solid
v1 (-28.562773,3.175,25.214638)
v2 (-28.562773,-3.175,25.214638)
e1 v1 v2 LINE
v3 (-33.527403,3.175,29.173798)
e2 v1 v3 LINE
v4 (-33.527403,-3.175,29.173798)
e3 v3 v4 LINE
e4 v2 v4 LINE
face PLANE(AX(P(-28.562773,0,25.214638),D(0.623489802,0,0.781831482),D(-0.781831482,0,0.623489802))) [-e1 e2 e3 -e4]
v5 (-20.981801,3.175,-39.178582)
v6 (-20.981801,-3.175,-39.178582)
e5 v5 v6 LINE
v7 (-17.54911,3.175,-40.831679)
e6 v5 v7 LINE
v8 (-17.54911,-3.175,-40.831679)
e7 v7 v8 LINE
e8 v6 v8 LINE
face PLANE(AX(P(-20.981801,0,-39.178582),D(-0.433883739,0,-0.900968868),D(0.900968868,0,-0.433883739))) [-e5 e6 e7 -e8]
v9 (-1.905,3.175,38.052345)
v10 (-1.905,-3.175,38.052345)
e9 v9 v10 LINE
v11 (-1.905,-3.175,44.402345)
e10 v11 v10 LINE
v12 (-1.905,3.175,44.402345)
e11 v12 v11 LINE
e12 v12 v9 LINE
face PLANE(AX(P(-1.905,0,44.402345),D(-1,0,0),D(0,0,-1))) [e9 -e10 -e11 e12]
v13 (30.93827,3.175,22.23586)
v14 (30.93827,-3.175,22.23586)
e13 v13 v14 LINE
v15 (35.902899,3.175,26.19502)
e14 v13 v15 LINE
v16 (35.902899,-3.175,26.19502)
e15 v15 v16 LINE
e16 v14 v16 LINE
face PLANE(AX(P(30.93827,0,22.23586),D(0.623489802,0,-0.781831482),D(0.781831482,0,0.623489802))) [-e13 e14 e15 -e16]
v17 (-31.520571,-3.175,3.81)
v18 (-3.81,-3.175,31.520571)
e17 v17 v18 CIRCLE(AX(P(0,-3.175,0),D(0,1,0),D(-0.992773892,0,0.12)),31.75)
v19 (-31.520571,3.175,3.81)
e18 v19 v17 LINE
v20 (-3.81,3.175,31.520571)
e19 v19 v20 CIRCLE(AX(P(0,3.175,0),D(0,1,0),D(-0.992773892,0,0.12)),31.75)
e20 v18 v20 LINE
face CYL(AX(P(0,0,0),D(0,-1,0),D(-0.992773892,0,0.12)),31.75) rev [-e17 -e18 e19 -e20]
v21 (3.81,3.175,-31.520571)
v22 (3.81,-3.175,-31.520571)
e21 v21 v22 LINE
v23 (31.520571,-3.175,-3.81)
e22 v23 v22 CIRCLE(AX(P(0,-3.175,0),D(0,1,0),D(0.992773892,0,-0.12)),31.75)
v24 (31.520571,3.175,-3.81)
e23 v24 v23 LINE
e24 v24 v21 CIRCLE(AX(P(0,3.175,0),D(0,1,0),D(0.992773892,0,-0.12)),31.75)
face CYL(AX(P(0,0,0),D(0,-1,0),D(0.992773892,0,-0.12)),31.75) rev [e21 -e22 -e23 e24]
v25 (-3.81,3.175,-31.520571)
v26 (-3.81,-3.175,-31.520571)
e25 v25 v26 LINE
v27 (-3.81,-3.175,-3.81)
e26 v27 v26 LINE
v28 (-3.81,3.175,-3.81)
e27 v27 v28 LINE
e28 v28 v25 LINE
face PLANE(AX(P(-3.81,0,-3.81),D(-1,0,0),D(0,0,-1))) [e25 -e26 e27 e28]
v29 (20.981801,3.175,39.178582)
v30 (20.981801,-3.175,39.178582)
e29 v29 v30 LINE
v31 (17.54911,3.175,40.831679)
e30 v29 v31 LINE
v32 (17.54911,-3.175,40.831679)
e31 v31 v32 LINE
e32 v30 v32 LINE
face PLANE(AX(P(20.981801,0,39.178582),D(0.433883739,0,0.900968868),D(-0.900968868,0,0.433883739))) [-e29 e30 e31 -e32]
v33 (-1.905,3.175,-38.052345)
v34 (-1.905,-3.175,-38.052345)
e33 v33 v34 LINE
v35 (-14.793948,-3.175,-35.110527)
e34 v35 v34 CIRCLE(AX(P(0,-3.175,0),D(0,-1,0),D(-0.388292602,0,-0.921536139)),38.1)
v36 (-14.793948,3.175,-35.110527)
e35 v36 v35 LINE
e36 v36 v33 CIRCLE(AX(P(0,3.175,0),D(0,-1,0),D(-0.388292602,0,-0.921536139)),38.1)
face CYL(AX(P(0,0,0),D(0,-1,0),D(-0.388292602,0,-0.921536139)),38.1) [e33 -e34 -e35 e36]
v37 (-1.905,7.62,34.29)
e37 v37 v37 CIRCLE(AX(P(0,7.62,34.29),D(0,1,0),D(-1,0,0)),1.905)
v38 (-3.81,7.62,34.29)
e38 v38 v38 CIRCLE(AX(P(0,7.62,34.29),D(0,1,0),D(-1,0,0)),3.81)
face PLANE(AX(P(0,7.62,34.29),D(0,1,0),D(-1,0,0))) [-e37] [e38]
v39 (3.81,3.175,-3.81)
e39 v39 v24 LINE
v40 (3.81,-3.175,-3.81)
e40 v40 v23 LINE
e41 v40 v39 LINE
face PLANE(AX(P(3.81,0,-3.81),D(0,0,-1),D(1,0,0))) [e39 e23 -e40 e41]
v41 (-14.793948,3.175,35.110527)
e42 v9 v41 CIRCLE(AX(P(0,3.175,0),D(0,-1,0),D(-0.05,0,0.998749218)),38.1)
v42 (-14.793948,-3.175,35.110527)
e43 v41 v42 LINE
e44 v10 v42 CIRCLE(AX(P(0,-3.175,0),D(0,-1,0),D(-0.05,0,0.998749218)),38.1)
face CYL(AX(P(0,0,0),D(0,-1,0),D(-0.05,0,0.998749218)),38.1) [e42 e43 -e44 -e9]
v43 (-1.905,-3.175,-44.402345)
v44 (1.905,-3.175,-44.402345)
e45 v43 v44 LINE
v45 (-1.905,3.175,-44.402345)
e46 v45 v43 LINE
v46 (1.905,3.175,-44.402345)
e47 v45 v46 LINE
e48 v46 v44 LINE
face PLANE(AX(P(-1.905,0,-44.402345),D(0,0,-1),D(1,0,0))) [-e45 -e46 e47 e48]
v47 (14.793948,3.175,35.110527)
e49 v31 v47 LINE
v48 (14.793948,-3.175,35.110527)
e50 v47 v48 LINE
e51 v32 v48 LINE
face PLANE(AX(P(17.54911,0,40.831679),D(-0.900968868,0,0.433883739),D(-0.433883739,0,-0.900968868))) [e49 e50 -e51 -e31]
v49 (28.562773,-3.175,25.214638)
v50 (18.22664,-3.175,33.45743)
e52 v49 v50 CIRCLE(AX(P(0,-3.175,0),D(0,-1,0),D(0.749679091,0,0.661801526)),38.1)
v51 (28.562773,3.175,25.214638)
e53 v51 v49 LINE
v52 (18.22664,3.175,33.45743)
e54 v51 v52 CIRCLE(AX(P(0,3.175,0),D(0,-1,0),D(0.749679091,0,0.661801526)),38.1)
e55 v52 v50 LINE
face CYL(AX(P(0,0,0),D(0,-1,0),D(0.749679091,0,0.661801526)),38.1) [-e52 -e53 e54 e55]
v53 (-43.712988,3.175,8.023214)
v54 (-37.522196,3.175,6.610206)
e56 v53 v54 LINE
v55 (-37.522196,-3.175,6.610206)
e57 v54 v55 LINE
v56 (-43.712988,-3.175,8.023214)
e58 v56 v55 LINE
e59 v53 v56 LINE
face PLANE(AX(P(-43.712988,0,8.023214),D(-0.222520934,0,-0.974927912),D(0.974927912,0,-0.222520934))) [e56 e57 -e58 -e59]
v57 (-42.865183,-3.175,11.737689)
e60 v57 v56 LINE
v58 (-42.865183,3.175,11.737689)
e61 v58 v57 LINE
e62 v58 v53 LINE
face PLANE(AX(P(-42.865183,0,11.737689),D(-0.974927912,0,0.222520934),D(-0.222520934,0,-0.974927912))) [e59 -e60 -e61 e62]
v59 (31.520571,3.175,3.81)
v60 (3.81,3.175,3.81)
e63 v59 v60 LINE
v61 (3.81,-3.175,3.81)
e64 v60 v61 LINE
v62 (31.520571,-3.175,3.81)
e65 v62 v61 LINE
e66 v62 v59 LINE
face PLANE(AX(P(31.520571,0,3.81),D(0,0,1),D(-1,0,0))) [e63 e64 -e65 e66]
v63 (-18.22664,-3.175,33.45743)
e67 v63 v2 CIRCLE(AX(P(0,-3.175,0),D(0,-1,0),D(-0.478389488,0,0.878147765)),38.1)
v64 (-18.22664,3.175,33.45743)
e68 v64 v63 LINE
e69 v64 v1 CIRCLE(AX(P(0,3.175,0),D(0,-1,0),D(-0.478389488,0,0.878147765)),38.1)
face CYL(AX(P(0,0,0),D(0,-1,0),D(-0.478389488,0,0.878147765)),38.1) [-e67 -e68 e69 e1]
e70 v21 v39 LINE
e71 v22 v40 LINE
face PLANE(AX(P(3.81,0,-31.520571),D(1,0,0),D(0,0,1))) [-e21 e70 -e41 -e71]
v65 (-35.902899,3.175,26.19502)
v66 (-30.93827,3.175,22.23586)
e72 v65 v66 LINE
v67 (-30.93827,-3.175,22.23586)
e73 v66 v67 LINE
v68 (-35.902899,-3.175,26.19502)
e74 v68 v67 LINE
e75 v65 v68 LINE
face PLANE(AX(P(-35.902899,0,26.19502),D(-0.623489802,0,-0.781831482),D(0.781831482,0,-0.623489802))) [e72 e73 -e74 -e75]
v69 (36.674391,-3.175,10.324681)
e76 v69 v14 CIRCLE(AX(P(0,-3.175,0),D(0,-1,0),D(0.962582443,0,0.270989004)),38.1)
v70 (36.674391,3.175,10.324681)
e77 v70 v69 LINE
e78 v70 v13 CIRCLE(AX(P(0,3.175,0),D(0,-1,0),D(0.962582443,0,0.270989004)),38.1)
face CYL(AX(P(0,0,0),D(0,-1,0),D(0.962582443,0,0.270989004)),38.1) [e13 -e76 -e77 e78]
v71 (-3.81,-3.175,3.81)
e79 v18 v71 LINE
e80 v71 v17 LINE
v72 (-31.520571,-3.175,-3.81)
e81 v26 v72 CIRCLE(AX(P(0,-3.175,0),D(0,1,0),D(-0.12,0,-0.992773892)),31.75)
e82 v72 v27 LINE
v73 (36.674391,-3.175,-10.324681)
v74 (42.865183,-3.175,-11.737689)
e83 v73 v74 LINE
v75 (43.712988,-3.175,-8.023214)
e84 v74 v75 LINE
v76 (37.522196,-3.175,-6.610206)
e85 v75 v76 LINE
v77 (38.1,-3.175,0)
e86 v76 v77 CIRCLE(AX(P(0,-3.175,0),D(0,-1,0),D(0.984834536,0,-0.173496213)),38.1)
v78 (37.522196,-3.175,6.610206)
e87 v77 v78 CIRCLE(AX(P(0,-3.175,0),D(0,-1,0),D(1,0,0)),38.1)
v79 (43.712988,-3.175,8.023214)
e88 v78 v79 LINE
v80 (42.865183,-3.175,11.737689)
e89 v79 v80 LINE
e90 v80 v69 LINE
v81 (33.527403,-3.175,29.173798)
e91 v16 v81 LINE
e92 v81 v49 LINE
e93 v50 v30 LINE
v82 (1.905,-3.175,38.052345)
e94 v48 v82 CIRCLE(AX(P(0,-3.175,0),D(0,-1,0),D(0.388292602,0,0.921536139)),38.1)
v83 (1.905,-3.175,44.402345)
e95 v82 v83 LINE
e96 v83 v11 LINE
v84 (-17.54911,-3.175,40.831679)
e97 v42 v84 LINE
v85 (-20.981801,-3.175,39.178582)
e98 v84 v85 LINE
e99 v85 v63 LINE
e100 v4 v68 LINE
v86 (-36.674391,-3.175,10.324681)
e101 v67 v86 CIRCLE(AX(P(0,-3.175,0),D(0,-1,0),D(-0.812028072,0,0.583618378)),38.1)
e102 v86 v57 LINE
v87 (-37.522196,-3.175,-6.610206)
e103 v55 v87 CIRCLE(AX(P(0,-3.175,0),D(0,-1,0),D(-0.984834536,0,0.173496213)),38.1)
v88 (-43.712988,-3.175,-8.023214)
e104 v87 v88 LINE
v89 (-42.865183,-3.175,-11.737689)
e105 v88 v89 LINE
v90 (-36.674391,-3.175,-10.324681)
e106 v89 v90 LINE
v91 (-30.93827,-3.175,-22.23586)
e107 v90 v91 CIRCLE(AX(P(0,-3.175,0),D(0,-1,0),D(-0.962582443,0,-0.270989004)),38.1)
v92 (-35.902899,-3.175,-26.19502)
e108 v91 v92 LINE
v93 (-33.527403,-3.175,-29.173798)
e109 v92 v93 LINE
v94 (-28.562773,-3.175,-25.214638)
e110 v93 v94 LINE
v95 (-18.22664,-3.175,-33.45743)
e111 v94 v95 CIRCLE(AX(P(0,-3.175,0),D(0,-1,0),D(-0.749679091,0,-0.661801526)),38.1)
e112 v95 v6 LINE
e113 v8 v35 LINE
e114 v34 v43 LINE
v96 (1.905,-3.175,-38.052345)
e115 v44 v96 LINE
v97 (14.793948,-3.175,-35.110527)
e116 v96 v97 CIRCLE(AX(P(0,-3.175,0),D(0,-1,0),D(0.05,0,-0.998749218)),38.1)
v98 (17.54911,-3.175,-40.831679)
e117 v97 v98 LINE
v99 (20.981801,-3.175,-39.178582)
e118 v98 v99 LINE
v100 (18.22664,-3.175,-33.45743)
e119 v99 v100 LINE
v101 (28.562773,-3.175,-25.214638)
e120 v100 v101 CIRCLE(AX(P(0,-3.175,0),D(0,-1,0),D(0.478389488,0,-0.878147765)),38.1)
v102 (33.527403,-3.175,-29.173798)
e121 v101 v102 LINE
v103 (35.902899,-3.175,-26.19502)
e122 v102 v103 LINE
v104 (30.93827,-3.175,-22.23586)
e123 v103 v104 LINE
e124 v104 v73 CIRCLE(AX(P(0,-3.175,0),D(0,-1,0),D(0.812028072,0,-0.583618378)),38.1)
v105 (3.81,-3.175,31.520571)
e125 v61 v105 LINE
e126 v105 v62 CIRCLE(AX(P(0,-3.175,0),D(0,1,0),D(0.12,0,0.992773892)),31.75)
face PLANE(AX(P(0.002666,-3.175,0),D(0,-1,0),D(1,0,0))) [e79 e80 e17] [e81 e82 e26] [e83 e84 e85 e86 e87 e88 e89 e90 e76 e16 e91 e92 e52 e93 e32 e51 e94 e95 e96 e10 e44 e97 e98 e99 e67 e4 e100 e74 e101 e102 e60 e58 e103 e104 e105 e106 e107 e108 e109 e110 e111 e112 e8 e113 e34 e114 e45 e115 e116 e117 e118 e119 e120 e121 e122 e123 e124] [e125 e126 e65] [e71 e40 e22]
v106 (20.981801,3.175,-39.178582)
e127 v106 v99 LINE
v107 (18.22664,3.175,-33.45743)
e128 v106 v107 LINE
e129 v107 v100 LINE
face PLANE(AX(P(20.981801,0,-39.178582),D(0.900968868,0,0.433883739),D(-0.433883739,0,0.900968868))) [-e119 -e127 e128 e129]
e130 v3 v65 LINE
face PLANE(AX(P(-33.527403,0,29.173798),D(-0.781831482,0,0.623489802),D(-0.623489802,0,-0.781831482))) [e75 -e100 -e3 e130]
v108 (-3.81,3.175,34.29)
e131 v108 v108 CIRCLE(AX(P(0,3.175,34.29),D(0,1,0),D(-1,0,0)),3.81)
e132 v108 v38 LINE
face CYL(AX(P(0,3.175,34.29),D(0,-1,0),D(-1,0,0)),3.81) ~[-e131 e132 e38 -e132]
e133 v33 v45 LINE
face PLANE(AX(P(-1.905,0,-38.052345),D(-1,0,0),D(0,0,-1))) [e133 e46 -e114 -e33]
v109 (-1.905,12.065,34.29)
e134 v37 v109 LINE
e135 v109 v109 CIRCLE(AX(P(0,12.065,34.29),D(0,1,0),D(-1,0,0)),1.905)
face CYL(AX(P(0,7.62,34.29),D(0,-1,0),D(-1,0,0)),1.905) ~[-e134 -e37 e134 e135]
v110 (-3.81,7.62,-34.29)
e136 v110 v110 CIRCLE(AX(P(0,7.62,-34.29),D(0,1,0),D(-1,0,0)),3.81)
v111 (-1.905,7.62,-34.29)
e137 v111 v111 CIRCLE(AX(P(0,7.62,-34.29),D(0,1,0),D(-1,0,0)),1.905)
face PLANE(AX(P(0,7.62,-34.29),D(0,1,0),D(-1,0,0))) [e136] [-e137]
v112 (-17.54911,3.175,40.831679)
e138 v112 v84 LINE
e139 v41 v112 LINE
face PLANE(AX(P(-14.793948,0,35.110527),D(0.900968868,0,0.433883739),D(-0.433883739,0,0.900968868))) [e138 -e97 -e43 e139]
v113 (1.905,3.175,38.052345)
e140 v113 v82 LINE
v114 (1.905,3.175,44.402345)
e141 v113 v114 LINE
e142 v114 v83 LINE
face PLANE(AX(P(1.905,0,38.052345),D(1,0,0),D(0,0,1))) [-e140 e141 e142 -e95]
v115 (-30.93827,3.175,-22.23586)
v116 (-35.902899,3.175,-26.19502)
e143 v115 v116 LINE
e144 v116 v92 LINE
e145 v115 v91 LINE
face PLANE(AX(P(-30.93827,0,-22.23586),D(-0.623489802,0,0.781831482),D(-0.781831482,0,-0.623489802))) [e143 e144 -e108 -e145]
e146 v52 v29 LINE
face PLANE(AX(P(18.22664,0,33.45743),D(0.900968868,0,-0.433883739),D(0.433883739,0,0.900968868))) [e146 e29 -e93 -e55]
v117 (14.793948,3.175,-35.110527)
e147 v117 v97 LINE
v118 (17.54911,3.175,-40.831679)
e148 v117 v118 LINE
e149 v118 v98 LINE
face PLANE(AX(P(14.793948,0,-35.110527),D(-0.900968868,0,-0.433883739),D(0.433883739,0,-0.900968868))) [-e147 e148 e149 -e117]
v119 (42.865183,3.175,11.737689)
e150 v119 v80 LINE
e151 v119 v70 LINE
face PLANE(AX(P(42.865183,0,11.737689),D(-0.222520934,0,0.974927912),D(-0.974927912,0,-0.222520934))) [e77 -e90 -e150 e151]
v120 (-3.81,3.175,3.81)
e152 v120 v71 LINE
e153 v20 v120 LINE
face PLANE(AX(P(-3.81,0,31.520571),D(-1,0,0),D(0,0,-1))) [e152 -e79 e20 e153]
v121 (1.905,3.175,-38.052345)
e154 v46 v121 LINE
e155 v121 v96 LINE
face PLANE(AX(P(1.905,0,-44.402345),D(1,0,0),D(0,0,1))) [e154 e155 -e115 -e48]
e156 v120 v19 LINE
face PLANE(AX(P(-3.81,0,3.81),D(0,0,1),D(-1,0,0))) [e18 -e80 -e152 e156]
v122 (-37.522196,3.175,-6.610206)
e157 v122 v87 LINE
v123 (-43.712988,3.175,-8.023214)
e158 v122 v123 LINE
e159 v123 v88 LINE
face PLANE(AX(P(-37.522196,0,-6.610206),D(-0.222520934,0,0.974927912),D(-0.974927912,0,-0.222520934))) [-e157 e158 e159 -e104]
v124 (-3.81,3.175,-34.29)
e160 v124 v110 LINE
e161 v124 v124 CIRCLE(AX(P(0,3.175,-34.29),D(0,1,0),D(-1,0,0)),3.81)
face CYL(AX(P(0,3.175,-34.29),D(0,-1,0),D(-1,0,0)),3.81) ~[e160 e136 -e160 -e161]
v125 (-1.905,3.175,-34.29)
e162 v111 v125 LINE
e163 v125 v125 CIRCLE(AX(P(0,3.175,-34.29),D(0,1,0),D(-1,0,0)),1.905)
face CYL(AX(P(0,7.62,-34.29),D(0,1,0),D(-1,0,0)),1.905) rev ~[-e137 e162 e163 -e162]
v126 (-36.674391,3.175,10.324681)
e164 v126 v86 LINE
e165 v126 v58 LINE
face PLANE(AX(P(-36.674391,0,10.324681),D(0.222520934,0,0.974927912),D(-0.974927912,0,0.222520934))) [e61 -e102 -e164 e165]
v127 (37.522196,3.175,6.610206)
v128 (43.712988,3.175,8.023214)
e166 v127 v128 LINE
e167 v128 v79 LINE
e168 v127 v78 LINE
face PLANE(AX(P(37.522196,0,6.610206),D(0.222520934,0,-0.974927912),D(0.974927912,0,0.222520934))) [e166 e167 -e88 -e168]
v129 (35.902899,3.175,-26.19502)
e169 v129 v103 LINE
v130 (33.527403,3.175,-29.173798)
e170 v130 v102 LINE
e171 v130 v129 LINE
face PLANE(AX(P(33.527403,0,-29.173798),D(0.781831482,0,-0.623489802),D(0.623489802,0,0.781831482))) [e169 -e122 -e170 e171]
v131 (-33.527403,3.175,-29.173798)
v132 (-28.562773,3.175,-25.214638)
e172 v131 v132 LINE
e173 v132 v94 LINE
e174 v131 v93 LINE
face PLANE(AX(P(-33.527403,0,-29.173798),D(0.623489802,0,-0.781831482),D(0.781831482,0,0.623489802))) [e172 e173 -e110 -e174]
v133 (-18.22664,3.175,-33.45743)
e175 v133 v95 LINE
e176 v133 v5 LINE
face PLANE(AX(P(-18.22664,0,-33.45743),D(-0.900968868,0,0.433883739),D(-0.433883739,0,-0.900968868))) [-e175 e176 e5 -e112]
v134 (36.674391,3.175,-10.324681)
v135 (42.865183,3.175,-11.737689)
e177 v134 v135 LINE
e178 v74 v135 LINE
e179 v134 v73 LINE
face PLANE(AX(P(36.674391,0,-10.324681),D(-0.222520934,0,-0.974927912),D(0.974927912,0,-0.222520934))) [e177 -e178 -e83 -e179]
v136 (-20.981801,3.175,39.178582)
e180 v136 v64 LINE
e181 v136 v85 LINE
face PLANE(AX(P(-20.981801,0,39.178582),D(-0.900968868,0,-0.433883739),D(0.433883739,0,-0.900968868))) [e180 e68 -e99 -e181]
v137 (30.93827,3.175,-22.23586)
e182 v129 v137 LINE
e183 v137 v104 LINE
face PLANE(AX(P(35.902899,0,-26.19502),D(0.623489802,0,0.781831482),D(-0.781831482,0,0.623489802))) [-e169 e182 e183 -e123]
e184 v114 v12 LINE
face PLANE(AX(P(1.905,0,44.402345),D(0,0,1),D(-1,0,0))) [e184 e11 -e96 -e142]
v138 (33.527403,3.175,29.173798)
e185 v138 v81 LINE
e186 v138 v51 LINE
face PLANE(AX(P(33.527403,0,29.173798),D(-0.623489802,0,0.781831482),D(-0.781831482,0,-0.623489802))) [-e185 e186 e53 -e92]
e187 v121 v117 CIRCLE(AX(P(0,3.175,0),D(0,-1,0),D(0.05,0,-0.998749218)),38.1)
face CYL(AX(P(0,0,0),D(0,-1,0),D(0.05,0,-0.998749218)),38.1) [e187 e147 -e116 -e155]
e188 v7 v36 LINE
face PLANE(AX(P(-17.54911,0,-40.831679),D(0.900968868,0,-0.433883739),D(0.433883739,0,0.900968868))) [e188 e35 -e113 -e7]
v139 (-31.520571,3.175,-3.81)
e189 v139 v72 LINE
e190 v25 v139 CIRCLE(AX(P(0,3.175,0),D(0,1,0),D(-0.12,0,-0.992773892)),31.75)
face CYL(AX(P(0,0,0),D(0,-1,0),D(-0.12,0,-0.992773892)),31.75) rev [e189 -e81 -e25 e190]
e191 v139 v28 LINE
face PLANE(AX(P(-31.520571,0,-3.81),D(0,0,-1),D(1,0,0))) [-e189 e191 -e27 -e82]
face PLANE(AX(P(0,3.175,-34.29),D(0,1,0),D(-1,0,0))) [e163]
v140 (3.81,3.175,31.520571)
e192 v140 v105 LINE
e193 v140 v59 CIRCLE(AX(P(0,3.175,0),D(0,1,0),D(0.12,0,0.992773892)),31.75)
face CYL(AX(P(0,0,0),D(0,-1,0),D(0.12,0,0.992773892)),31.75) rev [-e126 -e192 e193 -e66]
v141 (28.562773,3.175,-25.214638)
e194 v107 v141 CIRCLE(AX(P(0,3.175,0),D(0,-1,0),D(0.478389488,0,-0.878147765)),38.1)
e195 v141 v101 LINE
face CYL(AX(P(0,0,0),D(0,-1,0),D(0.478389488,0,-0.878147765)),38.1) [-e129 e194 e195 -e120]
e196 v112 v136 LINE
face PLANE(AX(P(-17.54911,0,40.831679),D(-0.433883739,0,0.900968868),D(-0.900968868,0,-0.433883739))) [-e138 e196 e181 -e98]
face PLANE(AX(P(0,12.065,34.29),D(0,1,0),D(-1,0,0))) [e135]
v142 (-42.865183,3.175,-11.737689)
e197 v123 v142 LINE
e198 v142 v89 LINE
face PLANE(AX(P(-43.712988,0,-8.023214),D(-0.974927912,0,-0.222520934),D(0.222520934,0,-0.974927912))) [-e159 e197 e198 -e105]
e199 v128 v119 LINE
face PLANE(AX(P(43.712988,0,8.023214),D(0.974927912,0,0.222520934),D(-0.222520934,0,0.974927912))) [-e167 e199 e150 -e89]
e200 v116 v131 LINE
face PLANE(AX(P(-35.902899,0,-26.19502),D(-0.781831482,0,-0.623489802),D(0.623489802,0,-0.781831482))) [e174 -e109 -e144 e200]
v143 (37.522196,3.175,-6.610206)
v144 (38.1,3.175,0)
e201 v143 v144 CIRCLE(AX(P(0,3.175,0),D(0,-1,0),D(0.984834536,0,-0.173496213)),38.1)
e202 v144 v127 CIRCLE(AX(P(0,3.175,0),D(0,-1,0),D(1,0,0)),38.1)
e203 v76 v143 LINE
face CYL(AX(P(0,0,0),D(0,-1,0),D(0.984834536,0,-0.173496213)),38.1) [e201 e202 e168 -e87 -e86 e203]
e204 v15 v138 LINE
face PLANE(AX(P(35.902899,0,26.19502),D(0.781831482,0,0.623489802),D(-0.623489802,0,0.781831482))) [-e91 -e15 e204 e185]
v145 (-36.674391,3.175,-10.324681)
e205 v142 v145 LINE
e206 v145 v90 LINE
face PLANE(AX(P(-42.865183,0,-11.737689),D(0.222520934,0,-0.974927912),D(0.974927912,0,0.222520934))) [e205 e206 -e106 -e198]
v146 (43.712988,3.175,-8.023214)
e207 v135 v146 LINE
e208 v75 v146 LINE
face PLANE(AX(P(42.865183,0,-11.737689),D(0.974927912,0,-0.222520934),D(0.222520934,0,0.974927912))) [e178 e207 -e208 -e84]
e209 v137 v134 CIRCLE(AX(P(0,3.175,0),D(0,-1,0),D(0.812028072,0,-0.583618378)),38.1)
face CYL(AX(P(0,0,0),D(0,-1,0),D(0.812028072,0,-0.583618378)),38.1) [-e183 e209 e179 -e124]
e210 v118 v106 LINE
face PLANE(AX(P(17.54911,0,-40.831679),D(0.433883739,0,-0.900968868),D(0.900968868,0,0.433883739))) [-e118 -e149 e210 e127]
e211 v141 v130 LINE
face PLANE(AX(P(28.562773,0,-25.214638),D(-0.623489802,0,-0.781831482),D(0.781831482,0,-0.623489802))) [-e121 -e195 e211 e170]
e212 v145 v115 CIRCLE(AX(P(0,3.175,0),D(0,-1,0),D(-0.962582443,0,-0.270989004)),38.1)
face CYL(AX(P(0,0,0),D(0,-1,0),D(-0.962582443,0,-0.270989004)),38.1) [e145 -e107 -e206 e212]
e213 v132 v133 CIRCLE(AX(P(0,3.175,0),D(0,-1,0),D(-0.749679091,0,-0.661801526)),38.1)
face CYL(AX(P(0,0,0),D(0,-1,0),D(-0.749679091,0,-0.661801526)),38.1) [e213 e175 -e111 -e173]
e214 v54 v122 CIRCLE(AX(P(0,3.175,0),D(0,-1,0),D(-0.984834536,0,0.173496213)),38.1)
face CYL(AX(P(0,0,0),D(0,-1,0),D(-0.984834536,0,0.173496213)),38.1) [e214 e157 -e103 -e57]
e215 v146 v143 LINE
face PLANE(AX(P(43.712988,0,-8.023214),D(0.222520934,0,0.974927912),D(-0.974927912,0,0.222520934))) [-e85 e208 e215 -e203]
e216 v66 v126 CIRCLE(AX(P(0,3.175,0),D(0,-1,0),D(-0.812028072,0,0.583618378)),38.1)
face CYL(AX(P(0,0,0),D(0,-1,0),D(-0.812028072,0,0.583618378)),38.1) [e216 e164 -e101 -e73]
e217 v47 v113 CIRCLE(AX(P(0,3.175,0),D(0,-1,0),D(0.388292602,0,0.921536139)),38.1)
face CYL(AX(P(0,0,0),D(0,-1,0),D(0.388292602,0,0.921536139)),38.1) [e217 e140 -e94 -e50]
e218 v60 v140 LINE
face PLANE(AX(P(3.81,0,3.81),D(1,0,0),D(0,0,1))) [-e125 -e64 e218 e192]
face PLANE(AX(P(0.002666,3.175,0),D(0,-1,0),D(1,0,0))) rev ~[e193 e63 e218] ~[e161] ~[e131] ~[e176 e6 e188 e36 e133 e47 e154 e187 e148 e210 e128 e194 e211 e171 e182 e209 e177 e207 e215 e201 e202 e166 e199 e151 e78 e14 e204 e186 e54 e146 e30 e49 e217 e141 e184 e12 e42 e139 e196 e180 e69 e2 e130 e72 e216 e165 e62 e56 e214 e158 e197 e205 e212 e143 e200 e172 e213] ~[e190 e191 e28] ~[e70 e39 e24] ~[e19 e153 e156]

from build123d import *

# Parameters (mm, degrees)
F0_W     = 7.62
F0_H     = 7.62
F1_DEPTH = 3.175
F2_R     = 3.81
F3_DEPTH = 4.445
F4_R     = 1.905
F5_DEPTH = 4.445
F6_R     = 1.905
F7_DEPTH = 4.445


with BuildPart() as f1:
    # F0 (on Front) → F1 (new body, symmetric)
    with BuildSketch(Plane.XZ):
        with BuildLine():
            ThreePointArc((37.5221958358, -6.6102057198), (37.9552740824, -3.3177054311), (38.1, 0))
            ThreePointArc((38.1, 0), (37.9552740824, 3.3177054311), (37.5221958358, 6.6102057198))
            ThreePointArc((37.5221958358, 6.6102057198), (37.1447534541, 8.4780475837), (36.6743910775, 10.3246810652))
            ThreePointArc((36.6743910775, 10.3246810652), (34.3269138671, 16.5309704604), (30.9382695294, 22.2358601931))
            ThreePointArc((30.9382695294, 22.2358601931), (29.787779482, 23.7549614508), (28.5627733843, 25.2146381413))
            ThreePointArc((28.5627733843, 25.2146381413), (23.7549614508, 29.787779482), (18.2266395097, 33.4574298503))
            ThreePointArc((18.2266395097, 33.4574298503), (16.5309704604, 34.3269138671), (14.793948123, 35.1105268963))
            ThreePointArc((14.793948123, 35.1105268963), (8.4780475837, 37.1447534541), (1.905, 38.0523451971))
            ThreePointArc((1.905, 38.0523451971), (0, 38.1), (-1.905, 38.0523451971))
            ThreePointArc((-1.905, 38.0523451971), (-8.4780475837, 37.1447534541), (-14.793948123, 35.1105268963))
            ThreePointArc((-14.793948123, 35.1105268963), (-16.5309704604, 34.3269138671), (-18.2266395097, 33.4574298503))
            ThreePointArc((-18.2266395097, 33.4574298503), (-23.7549614508, 29.787779482), (-28.5627733843, 25.2146381413))
            ThreePointArc((-28.5627733843, 25.2146381413), (-29.787779482, 23.7549614508), (-30.9382695294, 22.2358601931))
            ThreePointArc((-30.9382695294, 22.2358601931), (-34.3269138671, 16.5309704604), (-36.6743910775, 10.3246810652))
            ThreePointArc((-36.6743910775, 10.3246810652), (-37.1447534541, 8.4780475837), (-37.5221958358, 6.6102057198))
            ThreePointArc((-37.5221958358, 6.6102057198), (-38.1, 0), (-37.5221958358, -6.6102057198))
            ThreePointArc((-37.5221958358, -6.6102057198), (-37.1447534541, -8.4780475837), (-36.6743910775, -10.3246810652))
            ThreePointArc((-36.6743910775, -10.3246810652), (-34.3269138671, -16.5309704604), (-30.9382695294, -22.2358601931))
            ThreePointArc((-30.9382695294, -22.2358601931), (-29.787779482, -23.7549614508), (-28.5627733843, -25.2146381413))
            ThreePointArc((-28.5627733843, -25.2146381413), (-23.7549614508, -29.787779482), (-18.2266395097, -33.4574298503))
            ThreePointArc((-18.2266395097, -33.4574298503), (-16.5309704604, -34.3269138671), (-14.793948123, -35.1105268963))
            ThreePointArc((-14.793948123, -35.1105268963), (-8.4780475837, -37.1447534541), (-1.905, -38.0523451971))
            ThreePointArc((-1.905, -38.0523451971), (0, -38.1), (1.905, -38.0523451971))
            ThreePointArc((1.905, -38.0523451971), (8.4780475837, -37.1447534541), (14.793948123, -35.1105268963))
            ThreePointArc((14.793948123, -35.1105268963), (16.5309704604, -34.3269138671), (18.2266395097, -33.4574298503))
            ThreePointArc((18.2266395097, -33.4574298503), (23.7549614508, -29.787779482), (28.5627733843, -25.2146381413))
            ThreePointArc((28.5627733843, -25.2146381413), (29.787779482, -23.7549614508), (30.9382695294, -22.2358601931))
            ThreePointArc((30.9382695294, -22.2358601931), (34.3269138671, -16.5309704604), (36.6743910775, -10.3246810652))
            ThreePointArc((36.6743910775, -10.3246810652), (37.1447534541, -8.4780475837), (37.5221958358, -6.6102057198))
        make_face()
        with BuildLine():
            ThreePointArc((31.5205710608, 3.81), (31.6925908627, 1.9084507878), (31.75, 0))
            ThreePointArc((31.75, 0), (31.6925908627, -1.9084507878), (31.5205710608, -3.81))
            ThreePointArc((31.5205710608, -3.81), (22.4506403027, -22.4506403027), (3.81, -31.5205710608))
            ThreePointArc((3.81, -31.5205710608), (0, -31.75), (-3.81, -31.5205710608))
            ThreePointArc((-3.81, -31.5205710608), (-22.4506403027, -22.4506403027), (-31.5205710608, -3.81))
            ThreePointArc((-31.5205710608, -3.81), (-31.75, 0), (-31.5205710608, 3.81))
            ThreePointArc((-31.5205710608, 3.81), (-22.4506403027, 22.4506403027), (-3.81, 31.5205710608))
            ThreePointArc((-3.81, 31.5205710608), (0, 31.75), (3.81, 31.5205710608))
            ThreePointArc((3.81, 31.5205710608), (22.4506403027, 22.4506403027), (31.5205710608, 3.81))
        make_face(mode=Mode.SUBTRACT)
        with BuildLine():
            ThreePointArc((36.6743910775, 10.3246810652), (37.1447534541, 8.4780475837), (37.5221958358, 6.6102057198))
            Line((37.5221958358, 6.6102057198), (43.7129880782, 8.0232136504))
            Line((43.7129880782, 8.0232136504), (42.8651833198, 11.7376889958))
            Line((42.8651833198, 11.7376889958), (36.6743910775, 10.3246810652))
        make_face()
        with BuildLine():
            Line((43.7129880782, -8.0232136504), (37.5221958358, -6.6102057198))
            ThreePointArc((37.5221958358, -6.6102057198), (37.1447534541, -8.4780475837), (36.6743910775, -10.3246810652))
            Line((36.6743910775, -10.3246810652), (42.8651833198, -11.7376889958))
            Line((42.8651833198, -11.7376889958), (43.7129880782, -8.0232136504))
        make_face()
        with BuildLine():
            ThreePointArc((28.5627733843, 25.2146381413), (29.787779482, 23.7549614508), (30.9382695294, 22.2358601931))
            Line((30.9382695294, 22.2358601931), (35.9028994431, 26.1950204349))
            Line((35.9028994431, 26.1950204349), (33.527403298, 29.1737983831))
            Line((33.527403298, 29.1737983831), (28.5627733843, 25.2146381413))
        make_face()
        with BuildLine():
            Line((35.9028994431, -26.1950204349), (30.9382695294, -22.2358601931))
            ThreePointArc((30.9382695294, -22.2358601931), (29.787779482, -23.7549614508), (28.5627733843, -25.2146381413))
            Line((28.5627733843, -25.2146381413), (33.527403298, -29.1737983831))
            Line((33.527403298, -29.1737983831), (35.9028994431, -26.1950204349))
        make_face()
        with BuildLine():
            ThreePointArc((14.793948123, 35.1105268963), (16.5309704604, 34.3269138671), (18.2266395097, 33.4574298503))
            Line((18.2266395097, 33.4574298503), (20.9818012531, 39.1785821614))
            Line((20.9818012531, 39.1785821614), (17.5491098664, 40.8316792075))
            Line((17.5491098664, 40.8316792075), (14.793948123, 35.1105268963))
        make_face()
        with BuildLine():
            Line((20.9818012531, -39.1785821614), (18.2266395097, -33.4574298503))
            ThreePointArc((18.2266395097, -33.4574298503), (16.5309704604, -34.3269138671), (14.793948123, -35.1105268963))
            Line((14.793948123, -35.1105268963), (17.5491098664, -40.8316792075))
            Line((17.5491098664, -40.8316792075), (20.9818012531, -39.1785821614))
        make_face()
        with BuildLine():
            ThreePointArc((-1.905, 38.0523451971), (0, 38.1), (1.905, 38.0523451971))
            Line((1.905, 38.0523451971), (1.905, 44.4023451971))
            Line((1.905, 44.4023451971), (-1.905, 44.4023451971))
            Line((-1.905, 44.4023451971), (-1.905, 38.0523451971))
        make_face()
        with BuildLine():
            Line((1.905, -44.4023451971), (1.905, -38.0523451971))
            ThreePointArc((1.905, -38.0523451971), (0, -38.1), (-1.905, -38.0523451971))
            Line((-1.905, -38.0523451971), (-1.905, -44.4023451971))
            Line((-1.905, -44.4023451971), (1.905, -44.4023451971))
        make_face()
        with BuildLine():
            ThreePointArc((-18.2266395097, 33.4574298503), (-16.5309704604, 34.3269138671), (-14.793948123, 35.1105268963))
            Line((-14.793948123, 35.1105268963), (-17.5491098664, 40.8316792075))
            Line((-17.5491098664, 40.8316792075), (-20.9818012531, 39.1785821614))
            Line((-20.9818012531, 39.1785821614), (-18.2266395097, 33.4574298503))
        make_face()
        with BuildLine():
            Line((-17.5491098664, -40.8316792075), (-14.793948123, -35.1105268963))
            ThreePointArc((-14.793948123, -35.1105268963), (-16.5309704604, -34.3269138671), (-18.2266395097, -33.4574298503))
            Line((-18.2266395097, -33.4574298503), (-20.9818012531, -39.1785821614))
            Line((-20.9818012531, -39.1785821614), (-17.5491098664, -40.8316792075))
        make_face()
        with BuildLine():
            ThreePointArc((-30.9382695294, 22.2358601931), (-29.787779482, 23.7549614508), (-28.5627733843, 25.2146381413))
            Line((-28.5627733843, 25.2146381413), (-33.527403298, 29.1737983831))
            Line((-33.527403298, 29.1737983831), (-35.9028994431, 26.1950204349))
            Line((-35.9028994431, 26.1950204349), (-30.9382695294, 22.2358601931))
        make_face()
        with BuildLine():
            Line((-33.527403298, -29.1737983831), (-28.5627733843, -25.2146381413))
            ThreePointArc((-28.5627733843, -25.2146381413), (-29.787779482, -23.7549614508), (-30.9382695294, -22.2358601931))
            Line((-30.9382695294, -22.2358601931), (-35.9028994431, -26.1950204349))
            Line((-35.9028994431, -26.1950204349), (-33.527403298, -29.1737983831))
        make_face()
        with BuildLine():
            ThreePointArc((-37.5221958358, 6.6102057198), (-37.1447534541, 8.4780475837), (-36.6743910775, 10.3246810652))
            Line((-36.6743910775, 10.3246810652), (-42.8651833198, 11.7376889958))
            Line((-42.8651833198, 11.7376889958), (-43.7129880782, 8.0232136504))
            Line((-43.7129880782, 8.0232136504), (-37.5221958358, 6.6102057198))
        make_face()
        with BuildLine():
            Line((-42.8651833198, -11.7376889958), (-36.6743910775, -10.3246810652))
            ThreePointArc((-36.6743910775, -10.3246810652), (-37.1447534541, -8.4780475837), (-37.5221958358, -6.6102057198))
            Line((-37.5221958358, -6.6102057198), (-43.7129880782, -8.0232136504))
            Line((-43.7129880782, -8.0232136504), (-42.8651833198, -11.7376889958))
        make_face()
        with BuildLine():
            ThreePointArc((31.5205710608, -3.81), (31.6925908627, -1.9084507878), (31.75, 0))
            ThreePointArc((31.75, 0), (31.6925908627, 1.9084507878), (31.5205710608, 3.81))
            Line((31.5205710608, 3.81), (3.81, 3.81))
            Line((3.81, 3.81), (3.81, -3.81))
            Line((3.81, -3.81), (31.5205710608, -3.81))
        make_face()
        with BuildLine():
            Line((3.81, 3.81), (3.81, 31.5205710608))
            ThreePointArc((3.81, 31.5205710608), (0, 31.75), (-3.81, 31.5205710608))
            Line((-3.81, 31.5205710608), (-3.81, 3.81))
            Line((-3.81, 3.81), (3.81, 3.81))
        make_face()
        Rectangle(F0_W, F0_H)
        with BuildLine():
            ThreePointArc((-3.81, -31.5205710608), (0, -31.75), (3.81, -31.5205710608))
            Line((3.81, -31.5205710608), (3.81, -3.81))
            Line((3.81, -3.81), (-3.81, -3.81))
            Line((-3.81, -3.81), (-3.81, -31.5205710608))
        make_face()
        with BuildLine():
            Line((-3.81, -3.81), (-3.81, 3.81))
            Line((-3.81, 3.81), (-31.5205710608, 3.81))
            ThreePointArc((-31.5205710608, 3.81), (-31.75, 0), (-31.5205710608, -3.81))
            Line((-31.5205710608, -3.81), (-3.81, -3.81))
        make_face()
    extrude(amount=F1_DEPTH, both=True)

    # F2 (on face) → F3 (join)
    with BuildSketch(Plane(origin=(0, 3.175, 0), x_dir=(-1, 0, 0), z_dir=(0, 1, 0))):
        with Locations((0, 34.29)):
            Circle(F2_R)
        with Locations((0, -34.29)):
            Circle(F2_R)
    extrude(amount=F3_DEPTH)

    # F4 (on face) → F5 (join)
    with BuildSketch(Plane(origin=(0, 7.62, 0), x_dir=(-1, 0, 0), z_dir=(0, 1, 0))):
        with Locations((0, 34.29)):
            Circle(F4_R)
    extrude(amount=F5_DEPTH)

    # F6 (on face) → F7 (cut)
    with BuildSketch(Plane(origin=(0, 7.62, 0), x_dir=(-1, 0, 0), z_dir=(0, 1, 0))):
        with Locations((0, -34.29)):
            Circle(F6_R)
    extrude(amount=-F7_DEPTH, mode=Mode.SUBTRACT)


solid = f1.part
